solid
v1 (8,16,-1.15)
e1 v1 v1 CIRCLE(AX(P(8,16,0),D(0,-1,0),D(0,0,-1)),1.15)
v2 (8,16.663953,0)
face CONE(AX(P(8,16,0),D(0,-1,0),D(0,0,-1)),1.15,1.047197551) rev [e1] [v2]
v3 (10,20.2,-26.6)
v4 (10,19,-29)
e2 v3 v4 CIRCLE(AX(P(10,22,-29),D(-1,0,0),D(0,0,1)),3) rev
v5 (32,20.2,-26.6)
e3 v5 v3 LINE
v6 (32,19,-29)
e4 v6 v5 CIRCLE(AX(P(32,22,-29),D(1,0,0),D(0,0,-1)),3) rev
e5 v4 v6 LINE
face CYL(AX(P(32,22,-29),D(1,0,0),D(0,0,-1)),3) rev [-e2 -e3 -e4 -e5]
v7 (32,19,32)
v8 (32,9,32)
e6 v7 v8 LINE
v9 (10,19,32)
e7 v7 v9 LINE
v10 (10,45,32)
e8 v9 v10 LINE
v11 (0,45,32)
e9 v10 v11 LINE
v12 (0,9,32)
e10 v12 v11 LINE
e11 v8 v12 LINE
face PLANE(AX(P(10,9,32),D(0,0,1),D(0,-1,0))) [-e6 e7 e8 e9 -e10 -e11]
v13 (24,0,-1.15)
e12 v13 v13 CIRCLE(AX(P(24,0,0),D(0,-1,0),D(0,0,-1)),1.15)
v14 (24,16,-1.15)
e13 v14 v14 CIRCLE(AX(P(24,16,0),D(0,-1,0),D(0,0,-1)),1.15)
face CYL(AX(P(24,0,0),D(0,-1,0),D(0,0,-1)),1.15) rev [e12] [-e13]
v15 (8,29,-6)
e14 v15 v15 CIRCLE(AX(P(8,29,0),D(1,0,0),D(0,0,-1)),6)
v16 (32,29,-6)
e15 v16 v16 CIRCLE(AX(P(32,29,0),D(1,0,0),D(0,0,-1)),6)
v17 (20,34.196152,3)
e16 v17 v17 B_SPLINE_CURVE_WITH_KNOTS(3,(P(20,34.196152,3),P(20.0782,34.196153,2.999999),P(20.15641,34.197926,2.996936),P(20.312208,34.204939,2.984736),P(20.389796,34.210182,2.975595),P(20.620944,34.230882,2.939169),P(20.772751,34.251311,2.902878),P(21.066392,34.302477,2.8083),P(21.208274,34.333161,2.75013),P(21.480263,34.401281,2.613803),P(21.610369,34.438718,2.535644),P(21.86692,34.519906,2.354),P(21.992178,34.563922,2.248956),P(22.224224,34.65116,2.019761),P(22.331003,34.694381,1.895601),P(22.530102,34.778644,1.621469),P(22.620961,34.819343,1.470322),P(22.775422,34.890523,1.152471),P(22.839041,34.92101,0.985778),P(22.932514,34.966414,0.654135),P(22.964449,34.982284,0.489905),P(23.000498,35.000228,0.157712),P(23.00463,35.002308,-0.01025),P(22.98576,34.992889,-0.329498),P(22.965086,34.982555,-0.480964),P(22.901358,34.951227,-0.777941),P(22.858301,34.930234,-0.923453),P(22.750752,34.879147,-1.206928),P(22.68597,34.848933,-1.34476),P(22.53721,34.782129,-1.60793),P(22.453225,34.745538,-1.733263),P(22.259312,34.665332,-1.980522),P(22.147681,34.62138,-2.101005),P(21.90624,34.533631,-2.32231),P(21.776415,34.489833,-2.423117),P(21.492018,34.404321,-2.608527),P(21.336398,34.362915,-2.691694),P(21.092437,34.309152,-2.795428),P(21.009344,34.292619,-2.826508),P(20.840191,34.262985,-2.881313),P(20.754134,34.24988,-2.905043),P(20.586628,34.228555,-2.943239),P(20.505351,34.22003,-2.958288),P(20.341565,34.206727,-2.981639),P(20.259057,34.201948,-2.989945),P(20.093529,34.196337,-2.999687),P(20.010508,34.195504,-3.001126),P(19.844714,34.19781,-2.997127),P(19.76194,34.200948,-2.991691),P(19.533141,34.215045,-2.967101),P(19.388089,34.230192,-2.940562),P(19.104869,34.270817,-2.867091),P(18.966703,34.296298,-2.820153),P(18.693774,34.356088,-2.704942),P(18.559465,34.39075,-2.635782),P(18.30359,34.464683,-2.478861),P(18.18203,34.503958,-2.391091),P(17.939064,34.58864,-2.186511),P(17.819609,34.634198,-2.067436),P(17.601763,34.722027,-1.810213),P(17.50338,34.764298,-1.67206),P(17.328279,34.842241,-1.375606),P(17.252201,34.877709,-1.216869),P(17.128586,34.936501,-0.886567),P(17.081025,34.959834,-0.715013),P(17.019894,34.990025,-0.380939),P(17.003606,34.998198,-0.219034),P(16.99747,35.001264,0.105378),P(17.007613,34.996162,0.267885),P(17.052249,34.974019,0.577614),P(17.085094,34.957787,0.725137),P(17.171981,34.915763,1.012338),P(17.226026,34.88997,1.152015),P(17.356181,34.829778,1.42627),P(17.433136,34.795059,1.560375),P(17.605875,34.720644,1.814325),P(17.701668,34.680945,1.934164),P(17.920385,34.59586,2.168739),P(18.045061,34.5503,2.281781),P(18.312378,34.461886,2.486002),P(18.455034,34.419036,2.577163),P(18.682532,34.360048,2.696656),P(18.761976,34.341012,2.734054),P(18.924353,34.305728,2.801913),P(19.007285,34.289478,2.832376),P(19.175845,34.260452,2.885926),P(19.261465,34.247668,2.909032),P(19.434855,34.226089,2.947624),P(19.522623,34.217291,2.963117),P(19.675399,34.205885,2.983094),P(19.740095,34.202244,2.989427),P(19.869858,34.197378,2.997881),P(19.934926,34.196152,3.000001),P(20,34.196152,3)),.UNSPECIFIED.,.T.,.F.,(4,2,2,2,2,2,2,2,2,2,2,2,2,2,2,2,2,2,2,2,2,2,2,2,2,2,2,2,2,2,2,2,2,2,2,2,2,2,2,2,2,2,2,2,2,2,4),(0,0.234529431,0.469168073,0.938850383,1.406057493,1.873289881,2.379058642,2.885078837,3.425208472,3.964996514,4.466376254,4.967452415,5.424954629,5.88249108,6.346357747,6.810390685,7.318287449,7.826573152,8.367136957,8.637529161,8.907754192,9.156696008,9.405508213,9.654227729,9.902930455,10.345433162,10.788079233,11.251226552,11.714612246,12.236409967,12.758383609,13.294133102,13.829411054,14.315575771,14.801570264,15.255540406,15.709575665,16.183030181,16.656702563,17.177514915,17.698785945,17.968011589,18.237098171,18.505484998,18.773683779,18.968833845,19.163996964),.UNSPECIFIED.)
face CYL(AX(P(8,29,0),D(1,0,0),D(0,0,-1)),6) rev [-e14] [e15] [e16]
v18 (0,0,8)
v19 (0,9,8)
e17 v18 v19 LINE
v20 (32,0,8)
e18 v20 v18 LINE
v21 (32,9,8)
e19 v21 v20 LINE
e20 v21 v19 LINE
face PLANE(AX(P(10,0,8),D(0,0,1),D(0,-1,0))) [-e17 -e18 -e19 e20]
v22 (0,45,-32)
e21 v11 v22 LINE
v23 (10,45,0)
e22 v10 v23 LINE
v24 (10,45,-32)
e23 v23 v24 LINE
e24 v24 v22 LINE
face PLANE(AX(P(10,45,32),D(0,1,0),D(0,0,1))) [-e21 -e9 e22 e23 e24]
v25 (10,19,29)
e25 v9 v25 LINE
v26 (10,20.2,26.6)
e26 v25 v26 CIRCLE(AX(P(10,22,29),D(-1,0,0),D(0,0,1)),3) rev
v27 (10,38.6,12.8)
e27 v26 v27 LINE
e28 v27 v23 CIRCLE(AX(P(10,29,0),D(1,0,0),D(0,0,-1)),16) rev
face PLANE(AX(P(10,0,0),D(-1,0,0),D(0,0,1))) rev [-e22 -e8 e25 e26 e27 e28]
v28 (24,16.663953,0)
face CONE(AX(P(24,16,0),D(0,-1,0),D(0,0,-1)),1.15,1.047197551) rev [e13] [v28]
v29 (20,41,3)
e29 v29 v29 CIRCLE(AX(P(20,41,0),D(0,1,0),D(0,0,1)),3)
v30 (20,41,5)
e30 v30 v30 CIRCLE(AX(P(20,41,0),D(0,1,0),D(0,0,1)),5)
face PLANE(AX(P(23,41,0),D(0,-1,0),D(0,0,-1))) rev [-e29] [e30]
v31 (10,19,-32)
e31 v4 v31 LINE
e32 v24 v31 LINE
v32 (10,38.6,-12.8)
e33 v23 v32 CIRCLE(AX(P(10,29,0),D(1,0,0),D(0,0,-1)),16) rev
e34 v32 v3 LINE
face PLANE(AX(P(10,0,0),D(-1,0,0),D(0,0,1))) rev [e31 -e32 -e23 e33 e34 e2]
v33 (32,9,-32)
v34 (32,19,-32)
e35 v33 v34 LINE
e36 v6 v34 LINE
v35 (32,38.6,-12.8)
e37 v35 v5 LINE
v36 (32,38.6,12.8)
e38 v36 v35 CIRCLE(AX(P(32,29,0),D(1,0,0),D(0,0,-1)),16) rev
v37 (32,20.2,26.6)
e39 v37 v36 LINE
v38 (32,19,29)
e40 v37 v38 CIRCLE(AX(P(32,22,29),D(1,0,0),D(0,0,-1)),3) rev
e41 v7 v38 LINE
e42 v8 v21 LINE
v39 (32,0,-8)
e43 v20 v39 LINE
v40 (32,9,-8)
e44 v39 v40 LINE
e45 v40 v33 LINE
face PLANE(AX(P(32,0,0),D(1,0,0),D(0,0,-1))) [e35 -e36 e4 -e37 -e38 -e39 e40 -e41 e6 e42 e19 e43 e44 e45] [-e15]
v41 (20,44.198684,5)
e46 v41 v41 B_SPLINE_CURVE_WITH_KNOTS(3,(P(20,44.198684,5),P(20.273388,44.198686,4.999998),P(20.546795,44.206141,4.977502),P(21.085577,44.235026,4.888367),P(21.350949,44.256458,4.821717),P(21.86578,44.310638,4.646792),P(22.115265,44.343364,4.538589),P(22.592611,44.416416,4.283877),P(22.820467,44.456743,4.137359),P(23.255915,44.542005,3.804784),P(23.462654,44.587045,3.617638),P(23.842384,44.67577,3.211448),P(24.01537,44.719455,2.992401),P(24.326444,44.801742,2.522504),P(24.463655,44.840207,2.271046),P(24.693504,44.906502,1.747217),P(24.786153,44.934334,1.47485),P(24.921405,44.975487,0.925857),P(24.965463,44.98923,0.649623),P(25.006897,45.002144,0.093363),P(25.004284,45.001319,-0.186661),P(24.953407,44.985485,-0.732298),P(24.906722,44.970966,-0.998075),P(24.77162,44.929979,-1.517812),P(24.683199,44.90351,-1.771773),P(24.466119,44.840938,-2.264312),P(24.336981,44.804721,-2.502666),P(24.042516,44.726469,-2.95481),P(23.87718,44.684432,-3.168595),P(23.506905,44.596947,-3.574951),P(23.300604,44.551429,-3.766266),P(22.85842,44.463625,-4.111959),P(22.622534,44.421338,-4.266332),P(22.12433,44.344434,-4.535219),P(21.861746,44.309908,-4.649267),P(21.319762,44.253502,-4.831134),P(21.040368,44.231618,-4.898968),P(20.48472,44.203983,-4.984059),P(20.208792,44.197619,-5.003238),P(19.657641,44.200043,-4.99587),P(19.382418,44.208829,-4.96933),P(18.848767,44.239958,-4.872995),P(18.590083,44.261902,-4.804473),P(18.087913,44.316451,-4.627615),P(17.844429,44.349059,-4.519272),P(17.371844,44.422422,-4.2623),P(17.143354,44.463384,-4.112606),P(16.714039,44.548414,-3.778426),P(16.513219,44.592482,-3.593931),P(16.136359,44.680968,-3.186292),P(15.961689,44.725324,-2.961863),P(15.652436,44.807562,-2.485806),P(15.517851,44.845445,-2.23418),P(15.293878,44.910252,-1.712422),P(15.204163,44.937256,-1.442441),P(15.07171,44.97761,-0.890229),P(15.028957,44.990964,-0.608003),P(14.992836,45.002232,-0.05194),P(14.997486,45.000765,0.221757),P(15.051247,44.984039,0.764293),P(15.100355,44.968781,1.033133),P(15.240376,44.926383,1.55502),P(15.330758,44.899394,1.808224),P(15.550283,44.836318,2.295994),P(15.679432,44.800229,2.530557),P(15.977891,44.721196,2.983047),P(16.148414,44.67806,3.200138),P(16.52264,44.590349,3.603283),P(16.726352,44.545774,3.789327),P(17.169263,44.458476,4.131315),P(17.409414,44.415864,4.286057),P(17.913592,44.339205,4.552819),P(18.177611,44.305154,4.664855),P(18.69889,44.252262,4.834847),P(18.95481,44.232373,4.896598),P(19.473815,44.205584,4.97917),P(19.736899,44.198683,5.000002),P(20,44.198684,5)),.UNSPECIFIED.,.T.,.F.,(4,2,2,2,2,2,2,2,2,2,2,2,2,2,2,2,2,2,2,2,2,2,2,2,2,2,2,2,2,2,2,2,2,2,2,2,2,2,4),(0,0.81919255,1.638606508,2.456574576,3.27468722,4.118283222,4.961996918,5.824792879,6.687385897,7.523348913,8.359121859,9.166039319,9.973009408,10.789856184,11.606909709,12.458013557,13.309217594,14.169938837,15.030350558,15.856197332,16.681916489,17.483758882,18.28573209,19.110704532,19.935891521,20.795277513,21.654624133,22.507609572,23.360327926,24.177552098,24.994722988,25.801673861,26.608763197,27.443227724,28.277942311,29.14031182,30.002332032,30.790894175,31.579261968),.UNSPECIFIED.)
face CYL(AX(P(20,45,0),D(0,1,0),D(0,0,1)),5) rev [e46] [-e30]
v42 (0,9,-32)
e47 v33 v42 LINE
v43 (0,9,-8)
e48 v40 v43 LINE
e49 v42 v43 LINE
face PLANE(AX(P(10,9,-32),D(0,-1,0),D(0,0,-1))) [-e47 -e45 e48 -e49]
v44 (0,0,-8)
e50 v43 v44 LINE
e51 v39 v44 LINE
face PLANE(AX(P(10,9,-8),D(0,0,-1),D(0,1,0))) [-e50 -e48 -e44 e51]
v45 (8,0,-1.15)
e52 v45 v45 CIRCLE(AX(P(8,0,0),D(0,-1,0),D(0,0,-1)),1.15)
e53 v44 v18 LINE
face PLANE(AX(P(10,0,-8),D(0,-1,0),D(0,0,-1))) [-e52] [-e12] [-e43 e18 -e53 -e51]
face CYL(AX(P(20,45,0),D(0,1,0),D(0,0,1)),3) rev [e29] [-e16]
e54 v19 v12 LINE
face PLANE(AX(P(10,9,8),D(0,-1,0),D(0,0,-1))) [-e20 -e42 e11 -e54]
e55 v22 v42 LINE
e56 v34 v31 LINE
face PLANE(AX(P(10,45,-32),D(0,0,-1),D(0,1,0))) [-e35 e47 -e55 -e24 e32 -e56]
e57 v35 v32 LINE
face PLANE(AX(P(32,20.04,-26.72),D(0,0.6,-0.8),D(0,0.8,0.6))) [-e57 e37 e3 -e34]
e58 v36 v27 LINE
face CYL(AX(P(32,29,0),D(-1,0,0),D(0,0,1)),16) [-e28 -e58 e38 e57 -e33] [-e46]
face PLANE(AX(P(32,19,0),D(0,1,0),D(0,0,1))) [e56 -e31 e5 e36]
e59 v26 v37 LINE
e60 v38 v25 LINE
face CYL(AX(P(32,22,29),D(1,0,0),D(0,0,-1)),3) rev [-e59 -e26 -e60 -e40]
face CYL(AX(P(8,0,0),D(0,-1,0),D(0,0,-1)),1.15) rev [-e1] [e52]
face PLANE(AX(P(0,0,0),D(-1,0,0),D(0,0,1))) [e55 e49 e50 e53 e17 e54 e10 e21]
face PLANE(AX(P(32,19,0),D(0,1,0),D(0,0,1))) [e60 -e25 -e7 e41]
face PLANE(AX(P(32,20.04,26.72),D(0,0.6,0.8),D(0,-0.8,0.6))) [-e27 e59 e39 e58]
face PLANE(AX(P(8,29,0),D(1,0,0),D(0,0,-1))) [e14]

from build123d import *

# Parameters (mm, degrees)
BOSS_EXTRUDE1_DEPTH = 10
BOSS_EXTRUDE2_DEPTH = 22
SKETCH3_R           = 6
CUT_EXTRUDE1_DEPTH  = 24
LPATTERN1_COUNT     = 2
LPATTERN1_PITCH     = 16
FILLET1_R           = 3
FILLET2_R           = 3


# Read off the part's stored shape, not the designer's step: CBORE for M5 Hex Head Bolt1
with BuildPart() as part:
    # Sketch1 → Boss-Extrude1 (new body)
    with BuildSketch(Plane(origin=(0, 0, 0), x_dir=(0, 0, -1), z_dir=(1, 0, 0))):
        Polygon((-32, 45), (32, 45), (32, 9), (8, 9), (8, 0), (-8, 0), (-8, 9), (-32, 9), align=None)
    extrude(amount=BOSS_EXTRUDE1_DEPTH)

    # Sketch2 → Boss-Extrude2 (add)
    with BuildSketch(Plane(origin=(10, 0, 0), x_dir=(0, 0, -1), z_dir=(1, 0, 0))):
        with BuildLine():
            Line((0, 45), (0, 0))
            Line((0, 0), (8, 0))
            Line((8, 0), (8, 9))
            Line((8, 9), (32, 9))
            Line((32, 9), (32, 19))
            Line((32, 19), (27.5, 19))
            Line((27.5, 19), (12.8, 38.6))
            ThreePointArc((12.8, 38.6), (7.155417528, 43.310835056), (0, 45))
        make_face()
        with BuildLine():
            Line((-32, 9), (-8, 9))
            Line((-8, 9), (-8, 0))
            Line((-8, 0), (0, 0))
            Line((0, 0), (0, 45))
            ThreePointArc((0, 45), (-7.155417528, 43.310835056), (-12.8, 38.6))
            Line((-12.8, 38.6), (-27.5, 19))
            Line((-27.5, 19), (-32, 19))
            Line((-32, 19), (-32, 9))
        make_face()
    extrude(amount=BOSS_EXTRUDE2_DEPTH)

    # Sketch3 → Cut-Extrude1 (cut)
    with BuildSketch(Plane(origin=(32, 0, 0), x_dir=(0, 0, -1), z_dir=(1, 0, 0))):
        with Locations((0, 29)):
            Circle(SKETCH3_R)
    extrude(amount=-CUT_EXTRUDE1_DEPTH, mode=Mode.SUBTRACT)

    # CBORE for M5 Hex Head Bolt1 outline → CBORE for M5 Hex Head Bolt1 (revolve, cut)
    with BuildSketch(Plane(origin=(20, 0, 0), x_dir=(1, 0, 0), z_dir=(0, 0, 1))):
        Polygon((0, 34.195854076), (3, 34.195854076), (3, 41), (5, 41), (5, 45.000103319), (0, 45.000103319), align=None)
    revolve(axis=Axis((20, 0, 0), (0, 1, 0)), mode=Mode.SUBTRACT)

    # Sketch7 → Tap Drill for M2.2 Helicoil1 (revolve, cut)
    with BuildSketch(Plane(origin=(24, 0, 0), x_dir=(0, 0, -1), z_dir=(1, 0, 0))):
        Polygon((0, 0), (0, 16.66395281), (1.15, 16), (1.15, 0), align=None)
    tap_drill_for_m2_2_helicoil1 = revolve(axis=Axis((24, -6.35, 0), (0, 1, 0)), mode=Mode.SUBTRACT)

    # LPattern1: Tap Drill for M2.2 Helicoil1 ×2
    with Locations(*[(-i * LPATTERN1_PITCH, 0, 0) for i in range(1, LPATTERN1_COUNT)]):
        add(tap_drill_for_m2_2_helicoil1, mode=Mode.SUBTRACT)

    # Fillet1
    fillet1_edges = [part.edges().sort_by_distance(p)[0] for p in [
        (21, 19, 27.5),
    ]]
    fillet(fillet1_edges, radius=FILLET1_R)

    # Fillet2
    fillet2_edges = [part.edges().sort_by_distance(p)[0] for p in [
        (21, 19, -27.5),
    ]]
    fillet(fillet2_edges, radius=FILLET2_R)


solid = part.part
